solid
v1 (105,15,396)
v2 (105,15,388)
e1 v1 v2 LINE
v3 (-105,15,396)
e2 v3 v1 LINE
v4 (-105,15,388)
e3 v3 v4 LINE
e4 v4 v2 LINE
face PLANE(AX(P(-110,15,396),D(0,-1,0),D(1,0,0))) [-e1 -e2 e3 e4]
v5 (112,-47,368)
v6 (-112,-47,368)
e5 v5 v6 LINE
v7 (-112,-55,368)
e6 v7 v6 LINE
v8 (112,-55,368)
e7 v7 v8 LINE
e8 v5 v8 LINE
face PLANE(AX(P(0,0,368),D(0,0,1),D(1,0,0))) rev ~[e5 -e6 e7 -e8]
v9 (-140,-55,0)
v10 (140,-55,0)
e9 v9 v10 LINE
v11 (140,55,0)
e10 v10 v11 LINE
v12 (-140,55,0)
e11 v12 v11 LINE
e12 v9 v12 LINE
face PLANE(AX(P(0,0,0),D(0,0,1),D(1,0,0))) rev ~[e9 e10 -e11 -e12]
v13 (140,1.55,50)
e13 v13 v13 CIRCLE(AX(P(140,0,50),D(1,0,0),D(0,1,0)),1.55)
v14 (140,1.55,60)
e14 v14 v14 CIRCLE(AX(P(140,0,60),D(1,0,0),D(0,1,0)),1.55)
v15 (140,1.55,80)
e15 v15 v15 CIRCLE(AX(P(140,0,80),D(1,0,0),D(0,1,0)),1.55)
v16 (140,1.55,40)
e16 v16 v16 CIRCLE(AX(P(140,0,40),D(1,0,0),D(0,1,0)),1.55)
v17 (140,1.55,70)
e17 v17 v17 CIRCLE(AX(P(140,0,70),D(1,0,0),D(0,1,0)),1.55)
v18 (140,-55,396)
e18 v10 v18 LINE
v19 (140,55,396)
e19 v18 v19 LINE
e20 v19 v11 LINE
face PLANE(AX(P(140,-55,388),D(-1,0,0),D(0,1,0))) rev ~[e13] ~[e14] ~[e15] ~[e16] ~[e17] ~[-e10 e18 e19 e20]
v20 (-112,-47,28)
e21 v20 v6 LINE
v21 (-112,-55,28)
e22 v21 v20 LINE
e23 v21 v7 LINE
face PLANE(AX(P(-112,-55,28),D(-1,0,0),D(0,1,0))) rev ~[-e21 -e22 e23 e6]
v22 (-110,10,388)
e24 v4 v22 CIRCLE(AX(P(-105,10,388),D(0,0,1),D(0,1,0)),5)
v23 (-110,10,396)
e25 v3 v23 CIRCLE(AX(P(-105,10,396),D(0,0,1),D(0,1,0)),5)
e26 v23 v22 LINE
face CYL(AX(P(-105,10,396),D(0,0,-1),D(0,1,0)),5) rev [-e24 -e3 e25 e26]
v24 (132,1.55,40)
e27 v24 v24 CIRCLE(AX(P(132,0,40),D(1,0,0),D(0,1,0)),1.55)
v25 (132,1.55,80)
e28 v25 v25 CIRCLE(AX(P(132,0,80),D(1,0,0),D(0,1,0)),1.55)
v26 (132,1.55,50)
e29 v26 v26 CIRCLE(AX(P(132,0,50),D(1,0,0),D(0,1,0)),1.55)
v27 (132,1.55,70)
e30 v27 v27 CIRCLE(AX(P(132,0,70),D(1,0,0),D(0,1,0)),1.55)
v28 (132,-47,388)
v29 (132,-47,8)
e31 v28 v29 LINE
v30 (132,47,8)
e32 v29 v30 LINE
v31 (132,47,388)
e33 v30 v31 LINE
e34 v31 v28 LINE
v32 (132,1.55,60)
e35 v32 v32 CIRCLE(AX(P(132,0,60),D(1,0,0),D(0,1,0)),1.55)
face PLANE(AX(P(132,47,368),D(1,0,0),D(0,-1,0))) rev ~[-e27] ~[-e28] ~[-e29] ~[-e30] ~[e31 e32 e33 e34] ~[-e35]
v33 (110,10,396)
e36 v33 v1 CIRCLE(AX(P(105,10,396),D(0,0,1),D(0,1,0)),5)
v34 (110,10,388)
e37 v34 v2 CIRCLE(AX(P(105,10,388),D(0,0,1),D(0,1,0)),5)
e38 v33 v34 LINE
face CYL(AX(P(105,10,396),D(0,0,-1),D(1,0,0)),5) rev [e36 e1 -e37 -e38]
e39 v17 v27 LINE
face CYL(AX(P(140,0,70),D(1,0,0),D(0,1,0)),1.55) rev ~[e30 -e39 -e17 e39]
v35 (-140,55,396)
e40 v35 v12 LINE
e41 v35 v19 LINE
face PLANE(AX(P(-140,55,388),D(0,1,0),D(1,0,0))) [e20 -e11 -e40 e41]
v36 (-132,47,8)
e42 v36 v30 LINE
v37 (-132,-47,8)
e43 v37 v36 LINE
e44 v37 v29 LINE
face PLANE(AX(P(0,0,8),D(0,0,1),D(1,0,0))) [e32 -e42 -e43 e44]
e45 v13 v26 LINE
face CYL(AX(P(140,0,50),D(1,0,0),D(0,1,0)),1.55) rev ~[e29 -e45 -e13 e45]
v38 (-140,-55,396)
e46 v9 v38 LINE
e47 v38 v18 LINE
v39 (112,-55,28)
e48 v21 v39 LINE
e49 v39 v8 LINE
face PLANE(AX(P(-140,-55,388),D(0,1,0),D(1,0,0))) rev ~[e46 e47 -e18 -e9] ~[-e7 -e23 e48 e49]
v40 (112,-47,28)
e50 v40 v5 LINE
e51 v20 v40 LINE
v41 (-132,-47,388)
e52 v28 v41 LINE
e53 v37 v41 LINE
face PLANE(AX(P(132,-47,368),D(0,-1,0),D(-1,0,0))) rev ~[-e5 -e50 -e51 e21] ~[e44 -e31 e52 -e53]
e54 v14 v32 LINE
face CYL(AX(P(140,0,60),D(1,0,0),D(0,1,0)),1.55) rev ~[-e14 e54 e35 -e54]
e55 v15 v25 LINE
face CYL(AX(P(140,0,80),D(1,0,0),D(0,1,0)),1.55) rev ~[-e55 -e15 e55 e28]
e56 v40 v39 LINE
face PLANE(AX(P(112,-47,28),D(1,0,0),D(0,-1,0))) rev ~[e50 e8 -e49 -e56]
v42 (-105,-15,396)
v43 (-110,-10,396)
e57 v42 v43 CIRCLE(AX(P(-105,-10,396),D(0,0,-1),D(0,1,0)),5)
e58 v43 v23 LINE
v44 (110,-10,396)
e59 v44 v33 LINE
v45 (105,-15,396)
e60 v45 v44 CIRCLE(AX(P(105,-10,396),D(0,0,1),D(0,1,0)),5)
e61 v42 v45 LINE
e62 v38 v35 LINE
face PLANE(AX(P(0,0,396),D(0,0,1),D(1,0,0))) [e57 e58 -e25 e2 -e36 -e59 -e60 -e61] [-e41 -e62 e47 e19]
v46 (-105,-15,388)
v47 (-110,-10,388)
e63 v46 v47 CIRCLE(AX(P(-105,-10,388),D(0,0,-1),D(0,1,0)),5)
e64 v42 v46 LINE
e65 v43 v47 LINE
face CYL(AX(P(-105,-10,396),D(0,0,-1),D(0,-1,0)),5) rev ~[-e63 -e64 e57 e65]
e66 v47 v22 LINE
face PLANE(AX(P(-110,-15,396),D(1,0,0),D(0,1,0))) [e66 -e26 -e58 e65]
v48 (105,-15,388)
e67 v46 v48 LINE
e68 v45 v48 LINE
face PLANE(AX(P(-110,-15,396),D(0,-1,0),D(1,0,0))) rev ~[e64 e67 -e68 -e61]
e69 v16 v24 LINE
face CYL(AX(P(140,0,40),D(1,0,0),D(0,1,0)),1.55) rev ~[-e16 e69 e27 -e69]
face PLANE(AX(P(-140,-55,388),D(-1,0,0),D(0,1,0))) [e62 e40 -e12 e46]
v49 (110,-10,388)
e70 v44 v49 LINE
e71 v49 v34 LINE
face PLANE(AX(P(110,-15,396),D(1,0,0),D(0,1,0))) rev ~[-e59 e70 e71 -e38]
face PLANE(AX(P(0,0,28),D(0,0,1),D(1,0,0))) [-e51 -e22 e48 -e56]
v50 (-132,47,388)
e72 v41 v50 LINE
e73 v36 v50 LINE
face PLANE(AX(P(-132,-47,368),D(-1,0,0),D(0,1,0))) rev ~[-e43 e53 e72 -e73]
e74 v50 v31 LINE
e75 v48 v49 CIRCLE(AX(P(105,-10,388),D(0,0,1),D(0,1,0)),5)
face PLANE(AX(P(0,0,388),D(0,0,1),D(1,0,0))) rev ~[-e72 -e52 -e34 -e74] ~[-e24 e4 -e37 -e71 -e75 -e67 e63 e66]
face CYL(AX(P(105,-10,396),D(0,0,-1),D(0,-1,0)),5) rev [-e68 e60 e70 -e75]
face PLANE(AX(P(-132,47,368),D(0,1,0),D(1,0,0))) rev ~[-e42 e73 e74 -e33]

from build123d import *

# Parameters (mm, degrees)
F0_W      = 280
F0_H      = 110
F1_DEPTH  = 8
F2_W      = 280
F2_H      = 110
F2_W_2    = 264
F2_H_2    = 94
F3_DEPTH  = 20
F5_DEPTH  = 340
F7_DEPTH  = 20
F8_W      = 280
F8_H      = 110
F8_W_2    = 264
F8_H_2    = 94
F9_DEPTH  = 8
F10_R     = 1.55
F11_DEPTH = 8
F12_W     = 220
F12_H     = 30
F13_DEPTH = 8
F14_R     = 5


# Not quite as in the source:
# - a feature names something its author has since deleted; it is built from what else it names


with BuildPart() as f1:
    # F0 (on Top) → F1 (new body)
    with BuildSketch(Plane.XY):
        Rectangle(F0_W, F0_H)
    extrude(amount=F1_DEPTH)

    # F2 (on face) → F3 (join)
    with BuildSketch(Plane.XY.offset(8)):
        Rectangle(F2_W, F2_H)
        Rectangle(F2_W_2, F2_H_2, mode=Mode.SUBTRACT)
    extrude(amount=F3_DEPTH)

    # F4 (on face) → F5 (join)
    with BuildSketch(Plane.XY.offset(28)):
        Polygon((-132, -47), (-132, 47), (132, 47), (132, -47), (112, -47), (112, -55), (140, -55), (140, 55), (-140, 55), (-140, -55), (-112, -55), (-112, -47), align=None)
    extrude(amount=F5_DEPTH)

    # F6 (on face) → F7 (join)
    with BuildSketch(Plane.XY.offset(368)):
        Polygon((-140, -55), (-112, -55), (140, -55), (140, 55), (-140, 55), align=None)
        Polygon((-112, -47), (-132, -47), (-132, 47), (132, 47), (132, -47), align=None, mode=Mode.SUBTRACT)
    extrude(amount=F7_DEPTH)

    # F8 (on face) → F9 (join)
    with BuildSketch(Plane.XY.offset(388)):
        Rectangle(F8_W, F8_H)
        Rectangle(F8_W_2, F8_H_2, mode=Mode.SUBTRACT)
        Rectangle(F8_W_2, F8_H_2)
    extrude(amount=F9_DEPTH)

    # F10 (on face) → F11 (cut, through all)
    with BuildSketch(Plane.YZ.offset(140)):
        with Locations((0, 80)):
            Circle(F10_R)
        with Locations((0, 70)):
            Circle(F10_R)
        with Locations((0, 50)):
            Circle(F10_R)
        with Locations((0, 40)):
            Circle(F10_R)
        with Locations((0, 60)):
            Circle(F10_R)
    extrude(amount=-F11_DEPTH, mode=Mode.SUBTRACT)

    # F12 (on face) → F13 (cut, through all)
    with BuildSketch(Plane.XY.offset(396)):
        Rectangle(F12_W, F12_H)
    extrude(amount=-F13_DEPTH, mode=Mode.SUBTRACT)

    # F14
    f14_edges = [f1.edges().sort_by_distance(p)[0] for p in [
        (-110, 15, 392),
        (-110, -15, 392),
        (110, -15, 392),
        (110, 15, 392),
    ]]
    fillet(f14_edges, radius=F14_R)


solid = f1.part
